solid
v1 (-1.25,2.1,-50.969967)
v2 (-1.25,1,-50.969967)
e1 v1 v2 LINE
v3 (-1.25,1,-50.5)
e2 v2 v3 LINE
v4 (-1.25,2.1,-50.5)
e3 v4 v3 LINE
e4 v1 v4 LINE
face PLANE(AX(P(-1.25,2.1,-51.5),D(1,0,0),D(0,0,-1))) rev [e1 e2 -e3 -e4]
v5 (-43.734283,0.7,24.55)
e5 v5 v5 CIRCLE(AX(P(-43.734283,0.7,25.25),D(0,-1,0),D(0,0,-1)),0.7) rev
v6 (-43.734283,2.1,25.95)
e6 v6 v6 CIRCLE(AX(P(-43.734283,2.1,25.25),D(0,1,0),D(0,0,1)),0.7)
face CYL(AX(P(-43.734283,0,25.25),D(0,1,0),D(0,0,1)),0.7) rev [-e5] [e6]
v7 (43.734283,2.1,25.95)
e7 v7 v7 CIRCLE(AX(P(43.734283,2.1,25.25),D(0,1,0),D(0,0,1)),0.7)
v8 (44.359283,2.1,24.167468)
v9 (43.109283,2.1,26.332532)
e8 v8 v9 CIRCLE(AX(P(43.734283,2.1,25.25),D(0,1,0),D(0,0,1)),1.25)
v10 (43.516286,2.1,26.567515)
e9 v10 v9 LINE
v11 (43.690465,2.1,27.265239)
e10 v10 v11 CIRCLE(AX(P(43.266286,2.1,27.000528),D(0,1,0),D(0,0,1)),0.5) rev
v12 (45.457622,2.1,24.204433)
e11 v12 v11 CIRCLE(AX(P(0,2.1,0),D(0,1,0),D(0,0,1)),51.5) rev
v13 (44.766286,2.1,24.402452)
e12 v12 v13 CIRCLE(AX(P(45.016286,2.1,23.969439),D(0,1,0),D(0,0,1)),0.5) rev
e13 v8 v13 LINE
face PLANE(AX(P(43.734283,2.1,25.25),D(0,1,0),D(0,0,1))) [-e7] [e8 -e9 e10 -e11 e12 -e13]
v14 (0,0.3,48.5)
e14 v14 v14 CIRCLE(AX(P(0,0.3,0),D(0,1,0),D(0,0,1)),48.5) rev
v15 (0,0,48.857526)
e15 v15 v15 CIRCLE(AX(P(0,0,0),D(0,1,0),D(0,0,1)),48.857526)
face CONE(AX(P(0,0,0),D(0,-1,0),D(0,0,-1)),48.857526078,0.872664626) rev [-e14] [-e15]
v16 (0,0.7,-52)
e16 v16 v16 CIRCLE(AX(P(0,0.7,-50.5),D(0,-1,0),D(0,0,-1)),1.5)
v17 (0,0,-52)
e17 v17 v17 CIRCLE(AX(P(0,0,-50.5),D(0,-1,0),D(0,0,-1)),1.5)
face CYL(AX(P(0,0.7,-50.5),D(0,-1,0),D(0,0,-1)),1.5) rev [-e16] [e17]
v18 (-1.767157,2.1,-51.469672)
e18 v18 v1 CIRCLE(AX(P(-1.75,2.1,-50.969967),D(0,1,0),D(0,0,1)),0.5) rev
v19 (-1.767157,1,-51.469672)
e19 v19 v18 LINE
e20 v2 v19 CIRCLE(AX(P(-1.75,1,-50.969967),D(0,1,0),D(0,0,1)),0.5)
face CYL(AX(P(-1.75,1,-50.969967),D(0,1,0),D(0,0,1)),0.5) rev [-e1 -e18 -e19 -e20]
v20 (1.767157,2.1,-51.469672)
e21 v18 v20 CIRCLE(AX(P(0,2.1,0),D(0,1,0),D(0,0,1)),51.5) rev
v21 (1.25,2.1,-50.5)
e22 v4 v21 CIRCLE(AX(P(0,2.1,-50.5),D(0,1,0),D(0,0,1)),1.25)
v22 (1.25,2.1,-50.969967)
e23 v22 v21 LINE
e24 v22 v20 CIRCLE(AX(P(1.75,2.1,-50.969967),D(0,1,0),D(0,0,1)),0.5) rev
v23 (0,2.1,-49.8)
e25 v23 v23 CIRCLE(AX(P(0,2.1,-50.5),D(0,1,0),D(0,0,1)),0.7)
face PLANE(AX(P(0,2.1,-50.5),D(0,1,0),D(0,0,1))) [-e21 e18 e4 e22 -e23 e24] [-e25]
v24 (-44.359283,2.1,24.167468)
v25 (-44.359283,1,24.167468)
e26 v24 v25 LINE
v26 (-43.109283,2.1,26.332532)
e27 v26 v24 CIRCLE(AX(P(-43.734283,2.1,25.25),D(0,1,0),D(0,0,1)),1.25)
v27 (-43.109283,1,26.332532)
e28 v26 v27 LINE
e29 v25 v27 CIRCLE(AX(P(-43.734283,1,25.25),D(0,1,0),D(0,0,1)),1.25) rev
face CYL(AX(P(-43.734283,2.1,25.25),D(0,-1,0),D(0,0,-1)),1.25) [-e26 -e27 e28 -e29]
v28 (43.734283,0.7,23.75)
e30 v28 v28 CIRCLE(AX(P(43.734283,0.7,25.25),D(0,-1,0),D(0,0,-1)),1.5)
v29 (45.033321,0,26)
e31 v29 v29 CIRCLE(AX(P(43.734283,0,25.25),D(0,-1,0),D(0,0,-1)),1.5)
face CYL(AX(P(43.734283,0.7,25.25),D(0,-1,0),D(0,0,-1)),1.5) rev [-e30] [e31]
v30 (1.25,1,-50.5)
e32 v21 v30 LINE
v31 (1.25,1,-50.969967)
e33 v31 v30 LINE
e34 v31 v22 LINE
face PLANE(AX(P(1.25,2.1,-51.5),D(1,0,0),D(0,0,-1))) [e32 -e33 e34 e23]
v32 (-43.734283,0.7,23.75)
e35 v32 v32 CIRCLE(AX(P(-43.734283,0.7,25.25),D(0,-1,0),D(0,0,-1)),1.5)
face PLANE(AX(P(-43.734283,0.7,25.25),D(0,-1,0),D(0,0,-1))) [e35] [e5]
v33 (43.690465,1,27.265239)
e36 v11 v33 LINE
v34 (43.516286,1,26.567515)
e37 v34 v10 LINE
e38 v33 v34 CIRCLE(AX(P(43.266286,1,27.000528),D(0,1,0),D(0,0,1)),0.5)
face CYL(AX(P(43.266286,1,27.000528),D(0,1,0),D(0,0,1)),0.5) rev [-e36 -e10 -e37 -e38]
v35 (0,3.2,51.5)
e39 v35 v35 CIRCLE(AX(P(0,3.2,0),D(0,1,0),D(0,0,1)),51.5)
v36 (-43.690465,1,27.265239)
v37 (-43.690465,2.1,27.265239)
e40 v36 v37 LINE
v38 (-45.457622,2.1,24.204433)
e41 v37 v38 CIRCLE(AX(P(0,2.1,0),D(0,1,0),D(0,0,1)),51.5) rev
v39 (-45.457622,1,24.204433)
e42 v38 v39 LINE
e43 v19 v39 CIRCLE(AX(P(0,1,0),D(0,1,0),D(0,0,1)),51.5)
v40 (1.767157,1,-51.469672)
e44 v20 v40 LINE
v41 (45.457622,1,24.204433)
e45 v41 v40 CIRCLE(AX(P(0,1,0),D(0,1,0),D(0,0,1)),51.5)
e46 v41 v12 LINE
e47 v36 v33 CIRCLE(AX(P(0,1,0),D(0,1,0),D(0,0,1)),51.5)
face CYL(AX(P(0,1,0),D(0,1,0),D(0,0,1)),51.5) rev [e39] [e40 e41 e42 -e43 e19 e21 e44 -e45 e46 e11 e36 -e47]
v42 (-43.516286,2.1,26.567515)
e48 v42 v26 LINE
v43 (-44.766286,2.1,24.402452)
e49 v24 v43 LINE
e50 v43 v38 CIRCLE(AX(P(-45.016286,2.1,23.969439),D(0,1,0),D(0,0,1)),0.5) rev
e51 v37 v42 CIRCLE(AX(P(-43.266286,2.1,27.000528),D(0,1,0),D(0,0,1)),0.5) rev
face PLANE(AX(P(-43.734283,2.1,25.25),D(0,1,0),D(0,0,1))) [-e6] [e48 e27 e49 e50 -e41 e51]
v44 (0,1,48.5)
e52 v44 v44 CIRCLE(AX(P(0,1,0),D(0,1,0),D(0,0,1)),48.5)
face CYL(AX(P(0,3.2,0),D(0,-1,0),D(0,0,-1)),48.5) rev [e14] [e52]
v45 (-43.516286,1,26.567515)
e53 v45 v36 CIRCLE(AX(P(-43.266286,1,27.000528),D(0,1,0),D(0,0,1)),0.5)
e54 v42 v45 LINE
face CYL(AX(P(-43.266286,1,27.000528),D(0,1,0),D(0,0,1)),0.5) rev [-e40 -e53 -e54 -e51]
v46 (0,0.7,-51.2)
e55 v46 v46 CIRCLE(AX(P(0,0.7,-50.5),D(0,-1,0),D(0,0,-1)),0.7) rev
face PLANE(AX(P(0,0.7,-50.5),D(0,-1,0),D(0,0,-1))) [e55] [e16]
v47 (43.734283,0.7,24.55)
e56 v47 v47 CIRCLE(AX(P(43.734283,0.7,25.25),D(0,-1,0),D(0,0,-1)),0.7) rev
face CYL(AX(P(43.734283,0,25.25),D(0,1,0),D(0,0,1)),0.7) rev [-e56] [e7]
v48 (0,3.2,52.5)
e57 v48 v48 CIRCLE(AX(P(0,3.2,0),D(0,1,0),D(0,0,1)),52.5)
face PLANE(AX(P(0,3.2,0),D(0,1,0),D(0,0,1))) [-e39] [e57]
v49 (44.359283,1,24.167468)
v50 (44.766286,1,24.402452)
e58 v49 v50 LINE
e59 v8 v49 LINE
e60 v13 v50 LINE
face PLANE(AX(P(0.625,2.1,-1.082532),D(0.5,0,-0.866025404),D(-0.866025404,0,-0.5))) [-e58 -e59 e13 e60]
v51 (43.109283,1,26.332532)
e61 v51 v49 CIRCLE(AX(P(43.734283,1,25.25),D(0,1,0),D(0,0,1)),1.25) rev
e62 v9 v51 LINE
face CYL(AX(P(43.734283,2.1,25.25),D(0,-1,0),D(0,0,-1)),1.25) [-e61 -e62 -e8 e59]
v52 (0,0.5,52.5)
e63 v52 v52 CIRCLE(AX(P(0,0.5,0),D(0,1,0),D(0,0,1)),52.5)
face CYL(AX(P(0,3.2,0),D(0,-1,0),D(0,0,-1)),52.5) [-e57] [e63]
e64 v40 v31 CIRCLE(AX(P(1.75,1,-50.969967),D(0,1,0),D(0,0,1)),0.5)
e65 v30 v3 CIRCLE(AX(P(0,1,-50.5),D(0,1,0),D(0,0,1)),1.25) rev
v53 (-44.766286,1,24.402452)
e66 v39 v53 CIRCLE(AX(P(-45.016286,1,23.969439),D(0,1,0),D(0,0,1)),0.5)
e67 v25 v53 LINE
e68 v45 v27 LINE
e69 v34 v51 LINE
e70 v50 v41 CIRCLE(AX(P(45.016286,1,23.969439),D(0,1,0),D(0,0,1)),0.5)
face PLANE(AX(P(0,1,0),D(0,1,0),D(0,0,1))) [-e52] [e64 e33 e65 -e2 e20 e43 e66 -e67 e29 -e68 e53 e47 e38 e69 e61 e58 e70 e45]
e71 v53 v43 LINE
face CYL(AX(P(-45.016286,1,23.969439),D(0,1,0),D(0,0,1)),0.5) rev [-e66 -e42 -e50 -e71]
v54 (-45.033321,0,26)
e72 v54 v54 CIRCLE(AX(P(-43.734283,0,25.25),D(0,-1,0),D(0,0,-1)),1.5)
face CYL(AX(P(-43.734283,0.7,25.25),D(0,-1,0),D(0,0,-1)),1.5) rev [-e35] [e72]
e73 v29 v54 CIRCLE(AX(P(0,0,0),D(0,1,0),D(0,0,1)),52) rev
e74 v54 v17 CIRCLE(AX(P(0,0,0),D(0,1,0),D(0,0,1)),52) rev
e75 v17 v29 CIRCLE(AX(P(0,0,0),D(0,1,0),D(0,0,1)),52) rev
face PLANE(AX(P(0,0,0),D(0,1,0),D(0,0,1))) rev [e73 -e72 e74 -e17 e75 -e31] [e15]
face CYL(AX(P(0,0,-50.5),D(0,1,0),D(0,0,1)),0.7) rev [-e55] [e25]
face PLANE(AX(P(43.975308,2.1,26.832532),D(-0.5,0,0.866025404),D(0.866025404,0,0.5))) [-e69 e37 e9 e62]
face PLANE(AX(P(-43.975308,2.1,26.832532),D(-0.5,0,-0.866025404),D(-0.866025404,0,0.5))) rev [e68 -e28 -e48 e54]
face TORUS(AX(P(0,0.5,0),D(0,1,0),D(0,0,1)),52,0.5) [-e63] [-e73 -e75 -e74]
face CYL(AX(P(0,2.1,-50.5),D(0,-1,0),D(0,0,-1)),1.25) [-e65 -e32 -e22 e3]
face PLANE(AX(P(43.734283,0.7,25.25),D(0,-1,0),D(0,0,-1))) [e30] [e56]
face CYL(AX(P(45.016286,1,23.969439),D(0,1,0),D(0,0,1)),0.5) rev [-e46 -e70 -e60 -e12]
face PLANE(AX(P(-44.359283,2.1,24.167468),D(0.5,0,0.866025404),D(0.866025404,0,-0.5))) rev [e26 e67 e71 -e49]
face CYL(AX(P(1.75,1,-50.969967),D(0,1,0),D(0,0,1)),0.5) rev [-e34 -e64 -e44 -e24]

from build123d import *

# Parameters (mm, degrees)
SKETCH_1_R          = 52.5
SKETCH_1_R_2        = 48.5
EXTRUDE_1_DEPTH     = 3.2
SKETCH_2_R          = 51.5
CUT_EXTRUDE_1_DEPTH = 2.2
SKETCH_3_R          = 1.25
EXTRUDE_2_DEPTH     = 1.1
EXTRUDE_3_DEPTH     = 1.1
SKETCH_5_R          = 0.7
CUT_EXTRUDE_2_DEPTH = 75.315139776
SKETCH_6_R          = 1.5
CUT_EXTRUDE_3_DEPTH = 0.7
FILLET_1_R          = 0.5
CHAMFER_1_SIZE      = 0.3
CHAMFER_1_SIZE2     = 0.357526078


with BuildPart() as part:
    # 草图1 → 凸台-拉伸1 (new body)
    with BuildSketch(Plane(origin=(0, 0, 0), x_dir=(1, 0, 0), z_dir=(0, 1, 0))):
        with Locations(Location((0, 0, 0), (0, 0, 270))):
            Circle(SKETCH_1_R)
        with Locations(Location((0, 0, 0), (0, 0, 270))):
            Circle(SKETCH_1_R_2, mode=Mode.SUBTRACT)
    extrude(amount=EXTRUDE_1_DEPTH)

    # 草图2 → 切除-拉伸1 (cut)
    with BuildSketch(Plane(origin=(0, 3.2, 0), x_dir=(1, 0, 0), z_dir=(0, 1, 0))):
        with Locations(Location((0, 0, 0), (0, 0, 270))):
            Circle(SKETCH_2_R)
    extrude(amount=-CUT_EXTRUDE_1_DEPTH, mode=Mode.SUBTRACT)

    # 草图3 → 凸台-拉伸2 (add)
    with BuildSketch(Plane(origin=(0, 1, 0), x_dir=(1, 0, 0), z_dir=(0, 1, 0))):
        with Locations((-43.734282891, -25.25)):
            Circle(SKETCH_3_R)
        with Locations((43.734282891, -25.25)):
            Circle(SKETCH_3_R)
        with Locations((0, 50.5)):
            Circle(SKETCH_3_R)
    extrude(amount=EXTRUDE_2_DEPTH)

    # 草图4 → 凸台-拉伸3 (add)
    with BuildSketch(Plane(origin=(0, 1, 0), x_dir=(1, 0, 0), z_dir=(0, 1, 0))):
        with BuildLine():
            ThreePointArc((-44.974169566, -25.09131467), (-44.774871009, -24.557413277), (-44.359282891, -24.167468245))
            Line((-44.359282891, -24.167468245), (-45.225308295, -24.667468245))
            Line((-45.225308295, -24.667468245), (-44.600307976, -25.750000552))
            ThreePointArc((-44.600307976, -25.750000552), (-44.788449666, -25.4213449), (-44.974169566, -25.09131467))
        make_face()
        with BuildLine():
            Line((-43.975308295, -26.832531755), (-43.109282891, -26.332531755))
            ThreePointArc((-43.109282891, -26.332531755), (-43.654779254, -26.497469106), (-44.216800701, -26.403116023))
            ThreePointArc((-44.216800701, -26.403116023), (-44.409754992, -26.077263307), (-44.600307976, -25.750000552))
            Line((-44.600307976, -25.750000552), (-43.975308295, -26.832531755))
        make_face()
        with BuildLine():
            Line((-1.59e-07, 51.5), (-1.25, 51.5))
            Line((-1.25, 51.5), (-1.25, 50.5))
            ThreePointArc((-1.25, 50.5), (-1.120091755, 51.054882384), (-0.757368864, 51.494430693))
            ThreePointArc((-0.757368864, 51.494430693), (-0.37869475, 51.498607654), (-1.59e-07, 51.5))
        make_face()
        with BuildLine():
            Line((1.25, 51.5), (-1.59e-07, 51.5))
            ThreePointArc((-1.59e-07, 51.5), (0.378694591, 51.498607655), (0.757368864, 51.494430693))
            ThreePointArc((0.757368864, 51.494430693), (1.120091755, 51.054882384), (1.25, 50.5))
            Line((1.25, 50.5), (1.25, 51.5))
        make_face()
        with BuildLine():
            Line((45.225308295, -24.667468245), (44.359282891, -24.167468245))
            ThreePointArc((44.359282891, -24.167468245), (44.774871009, -24.557413277), (44.974169566, -25.09131467))
            ThreePointArc((44.974169566, -25.09131467), (44.788449793, -25.421344676), (44.600308233, -25.750000108))
            Line((44.600308233, -25.750000108), (45.225308295, -24.667468245))
        make_face()
        with BuildLine():
            ThreePointArc((44.216800701, -26.403116023), (43.654779254, -26.497469107), (43.109282891, -26.332531755))
            Line((43.109282891, -26.332531755), (43.975308295, -26.832531755))
            Line((43.975308295, -26.832531755), (44.600308233, -25.750000108))
            ThreePointArc((44.600308233, -25.750000108), (44.409755121, -26.077263086), (44.216800701, -26.403116023))
        make_face()
    extrude(amount=EXTRUDE_3_DEPTH)

    # 草图5 → 切除-拉伸2 (cut, through all)
    with BuildSketch(Plane(origin=(0, 3.2, 0), x_dir=(1, 0, 0), z_dir=(0, 1, 0))):
        with Locations(Location((0, 50.5, 0), (0, 0, 270))):
            Circle(SKETCH_5_R)
        with Locations(Location((-43.734282891, -25.25, 0), (0, 0, 270))):
            Circle(SKETCH_5_R)
        with Locations(Location((43.734282891, -25.25, 0), (0, 0, 270))):
            Circle(SKETCH_5_R)
    extrude(amount=-CUT_EXTRUDE_2_DEPTH, mode=Mode.SUBTRACT)

    # 草图6 → 切除-拉伸3 (cut)
    with BuildSketch(Plane.XZ):
        with Locations(Location((-43.734282891, 25.25, 0), (0, 0, 270))):
            Circle(SKETCH_6_R)
        with Locations(Location((0, -50.5, 0), (0, 0, 270))):
            Circle(SKETCH_6_R)
        with Locations(Location((43.734282891, 25.25, 0), (0, 0, 270))):
            Circle(SKETCH_6_R)
    extrude(amount=-CUT_EXTRUDE_3_DEPTH, mode=Mode.SUBTRACT)

    # 圆角1
    fillet_1_edges = [part.edges().sort_by_distance(p)[0] for p in [
        (0, 0, -52.5),
        (-43.962168838, 1.55, 26.824945686),
        (-45.212168838, 1.55, 24.659882176),
        (-1.25, 1.55, -51.484827862),
        (1.25, 1.55, -51.484827862),
        (45.212168838, 1.55, 24.659882176),
        (43.962168838, 1.55, 26.824945686),
    ]]
    fillet(fillet_1_edges, radius=FILLET_1_R - 0.0001)  # a hair under: the kernel refuses the full size

    # 倒角1
    chamfer_1_edges = [part.edges().sort_by_distance(p)[0] for p in [
        (0, 0, -48.5),
    ]]
    chamfer_1_side = [part.faces().sort_by_distance(p)[0] for p in [
        (0, 0.5, -48.5),
    ]]
    chamfer(chamfer_1_edges, length=CHAMFER_1_SIZE, length2=CHAMFER_1_SIZE2, reference=chamfer_1_side[0])


solid = part.part
